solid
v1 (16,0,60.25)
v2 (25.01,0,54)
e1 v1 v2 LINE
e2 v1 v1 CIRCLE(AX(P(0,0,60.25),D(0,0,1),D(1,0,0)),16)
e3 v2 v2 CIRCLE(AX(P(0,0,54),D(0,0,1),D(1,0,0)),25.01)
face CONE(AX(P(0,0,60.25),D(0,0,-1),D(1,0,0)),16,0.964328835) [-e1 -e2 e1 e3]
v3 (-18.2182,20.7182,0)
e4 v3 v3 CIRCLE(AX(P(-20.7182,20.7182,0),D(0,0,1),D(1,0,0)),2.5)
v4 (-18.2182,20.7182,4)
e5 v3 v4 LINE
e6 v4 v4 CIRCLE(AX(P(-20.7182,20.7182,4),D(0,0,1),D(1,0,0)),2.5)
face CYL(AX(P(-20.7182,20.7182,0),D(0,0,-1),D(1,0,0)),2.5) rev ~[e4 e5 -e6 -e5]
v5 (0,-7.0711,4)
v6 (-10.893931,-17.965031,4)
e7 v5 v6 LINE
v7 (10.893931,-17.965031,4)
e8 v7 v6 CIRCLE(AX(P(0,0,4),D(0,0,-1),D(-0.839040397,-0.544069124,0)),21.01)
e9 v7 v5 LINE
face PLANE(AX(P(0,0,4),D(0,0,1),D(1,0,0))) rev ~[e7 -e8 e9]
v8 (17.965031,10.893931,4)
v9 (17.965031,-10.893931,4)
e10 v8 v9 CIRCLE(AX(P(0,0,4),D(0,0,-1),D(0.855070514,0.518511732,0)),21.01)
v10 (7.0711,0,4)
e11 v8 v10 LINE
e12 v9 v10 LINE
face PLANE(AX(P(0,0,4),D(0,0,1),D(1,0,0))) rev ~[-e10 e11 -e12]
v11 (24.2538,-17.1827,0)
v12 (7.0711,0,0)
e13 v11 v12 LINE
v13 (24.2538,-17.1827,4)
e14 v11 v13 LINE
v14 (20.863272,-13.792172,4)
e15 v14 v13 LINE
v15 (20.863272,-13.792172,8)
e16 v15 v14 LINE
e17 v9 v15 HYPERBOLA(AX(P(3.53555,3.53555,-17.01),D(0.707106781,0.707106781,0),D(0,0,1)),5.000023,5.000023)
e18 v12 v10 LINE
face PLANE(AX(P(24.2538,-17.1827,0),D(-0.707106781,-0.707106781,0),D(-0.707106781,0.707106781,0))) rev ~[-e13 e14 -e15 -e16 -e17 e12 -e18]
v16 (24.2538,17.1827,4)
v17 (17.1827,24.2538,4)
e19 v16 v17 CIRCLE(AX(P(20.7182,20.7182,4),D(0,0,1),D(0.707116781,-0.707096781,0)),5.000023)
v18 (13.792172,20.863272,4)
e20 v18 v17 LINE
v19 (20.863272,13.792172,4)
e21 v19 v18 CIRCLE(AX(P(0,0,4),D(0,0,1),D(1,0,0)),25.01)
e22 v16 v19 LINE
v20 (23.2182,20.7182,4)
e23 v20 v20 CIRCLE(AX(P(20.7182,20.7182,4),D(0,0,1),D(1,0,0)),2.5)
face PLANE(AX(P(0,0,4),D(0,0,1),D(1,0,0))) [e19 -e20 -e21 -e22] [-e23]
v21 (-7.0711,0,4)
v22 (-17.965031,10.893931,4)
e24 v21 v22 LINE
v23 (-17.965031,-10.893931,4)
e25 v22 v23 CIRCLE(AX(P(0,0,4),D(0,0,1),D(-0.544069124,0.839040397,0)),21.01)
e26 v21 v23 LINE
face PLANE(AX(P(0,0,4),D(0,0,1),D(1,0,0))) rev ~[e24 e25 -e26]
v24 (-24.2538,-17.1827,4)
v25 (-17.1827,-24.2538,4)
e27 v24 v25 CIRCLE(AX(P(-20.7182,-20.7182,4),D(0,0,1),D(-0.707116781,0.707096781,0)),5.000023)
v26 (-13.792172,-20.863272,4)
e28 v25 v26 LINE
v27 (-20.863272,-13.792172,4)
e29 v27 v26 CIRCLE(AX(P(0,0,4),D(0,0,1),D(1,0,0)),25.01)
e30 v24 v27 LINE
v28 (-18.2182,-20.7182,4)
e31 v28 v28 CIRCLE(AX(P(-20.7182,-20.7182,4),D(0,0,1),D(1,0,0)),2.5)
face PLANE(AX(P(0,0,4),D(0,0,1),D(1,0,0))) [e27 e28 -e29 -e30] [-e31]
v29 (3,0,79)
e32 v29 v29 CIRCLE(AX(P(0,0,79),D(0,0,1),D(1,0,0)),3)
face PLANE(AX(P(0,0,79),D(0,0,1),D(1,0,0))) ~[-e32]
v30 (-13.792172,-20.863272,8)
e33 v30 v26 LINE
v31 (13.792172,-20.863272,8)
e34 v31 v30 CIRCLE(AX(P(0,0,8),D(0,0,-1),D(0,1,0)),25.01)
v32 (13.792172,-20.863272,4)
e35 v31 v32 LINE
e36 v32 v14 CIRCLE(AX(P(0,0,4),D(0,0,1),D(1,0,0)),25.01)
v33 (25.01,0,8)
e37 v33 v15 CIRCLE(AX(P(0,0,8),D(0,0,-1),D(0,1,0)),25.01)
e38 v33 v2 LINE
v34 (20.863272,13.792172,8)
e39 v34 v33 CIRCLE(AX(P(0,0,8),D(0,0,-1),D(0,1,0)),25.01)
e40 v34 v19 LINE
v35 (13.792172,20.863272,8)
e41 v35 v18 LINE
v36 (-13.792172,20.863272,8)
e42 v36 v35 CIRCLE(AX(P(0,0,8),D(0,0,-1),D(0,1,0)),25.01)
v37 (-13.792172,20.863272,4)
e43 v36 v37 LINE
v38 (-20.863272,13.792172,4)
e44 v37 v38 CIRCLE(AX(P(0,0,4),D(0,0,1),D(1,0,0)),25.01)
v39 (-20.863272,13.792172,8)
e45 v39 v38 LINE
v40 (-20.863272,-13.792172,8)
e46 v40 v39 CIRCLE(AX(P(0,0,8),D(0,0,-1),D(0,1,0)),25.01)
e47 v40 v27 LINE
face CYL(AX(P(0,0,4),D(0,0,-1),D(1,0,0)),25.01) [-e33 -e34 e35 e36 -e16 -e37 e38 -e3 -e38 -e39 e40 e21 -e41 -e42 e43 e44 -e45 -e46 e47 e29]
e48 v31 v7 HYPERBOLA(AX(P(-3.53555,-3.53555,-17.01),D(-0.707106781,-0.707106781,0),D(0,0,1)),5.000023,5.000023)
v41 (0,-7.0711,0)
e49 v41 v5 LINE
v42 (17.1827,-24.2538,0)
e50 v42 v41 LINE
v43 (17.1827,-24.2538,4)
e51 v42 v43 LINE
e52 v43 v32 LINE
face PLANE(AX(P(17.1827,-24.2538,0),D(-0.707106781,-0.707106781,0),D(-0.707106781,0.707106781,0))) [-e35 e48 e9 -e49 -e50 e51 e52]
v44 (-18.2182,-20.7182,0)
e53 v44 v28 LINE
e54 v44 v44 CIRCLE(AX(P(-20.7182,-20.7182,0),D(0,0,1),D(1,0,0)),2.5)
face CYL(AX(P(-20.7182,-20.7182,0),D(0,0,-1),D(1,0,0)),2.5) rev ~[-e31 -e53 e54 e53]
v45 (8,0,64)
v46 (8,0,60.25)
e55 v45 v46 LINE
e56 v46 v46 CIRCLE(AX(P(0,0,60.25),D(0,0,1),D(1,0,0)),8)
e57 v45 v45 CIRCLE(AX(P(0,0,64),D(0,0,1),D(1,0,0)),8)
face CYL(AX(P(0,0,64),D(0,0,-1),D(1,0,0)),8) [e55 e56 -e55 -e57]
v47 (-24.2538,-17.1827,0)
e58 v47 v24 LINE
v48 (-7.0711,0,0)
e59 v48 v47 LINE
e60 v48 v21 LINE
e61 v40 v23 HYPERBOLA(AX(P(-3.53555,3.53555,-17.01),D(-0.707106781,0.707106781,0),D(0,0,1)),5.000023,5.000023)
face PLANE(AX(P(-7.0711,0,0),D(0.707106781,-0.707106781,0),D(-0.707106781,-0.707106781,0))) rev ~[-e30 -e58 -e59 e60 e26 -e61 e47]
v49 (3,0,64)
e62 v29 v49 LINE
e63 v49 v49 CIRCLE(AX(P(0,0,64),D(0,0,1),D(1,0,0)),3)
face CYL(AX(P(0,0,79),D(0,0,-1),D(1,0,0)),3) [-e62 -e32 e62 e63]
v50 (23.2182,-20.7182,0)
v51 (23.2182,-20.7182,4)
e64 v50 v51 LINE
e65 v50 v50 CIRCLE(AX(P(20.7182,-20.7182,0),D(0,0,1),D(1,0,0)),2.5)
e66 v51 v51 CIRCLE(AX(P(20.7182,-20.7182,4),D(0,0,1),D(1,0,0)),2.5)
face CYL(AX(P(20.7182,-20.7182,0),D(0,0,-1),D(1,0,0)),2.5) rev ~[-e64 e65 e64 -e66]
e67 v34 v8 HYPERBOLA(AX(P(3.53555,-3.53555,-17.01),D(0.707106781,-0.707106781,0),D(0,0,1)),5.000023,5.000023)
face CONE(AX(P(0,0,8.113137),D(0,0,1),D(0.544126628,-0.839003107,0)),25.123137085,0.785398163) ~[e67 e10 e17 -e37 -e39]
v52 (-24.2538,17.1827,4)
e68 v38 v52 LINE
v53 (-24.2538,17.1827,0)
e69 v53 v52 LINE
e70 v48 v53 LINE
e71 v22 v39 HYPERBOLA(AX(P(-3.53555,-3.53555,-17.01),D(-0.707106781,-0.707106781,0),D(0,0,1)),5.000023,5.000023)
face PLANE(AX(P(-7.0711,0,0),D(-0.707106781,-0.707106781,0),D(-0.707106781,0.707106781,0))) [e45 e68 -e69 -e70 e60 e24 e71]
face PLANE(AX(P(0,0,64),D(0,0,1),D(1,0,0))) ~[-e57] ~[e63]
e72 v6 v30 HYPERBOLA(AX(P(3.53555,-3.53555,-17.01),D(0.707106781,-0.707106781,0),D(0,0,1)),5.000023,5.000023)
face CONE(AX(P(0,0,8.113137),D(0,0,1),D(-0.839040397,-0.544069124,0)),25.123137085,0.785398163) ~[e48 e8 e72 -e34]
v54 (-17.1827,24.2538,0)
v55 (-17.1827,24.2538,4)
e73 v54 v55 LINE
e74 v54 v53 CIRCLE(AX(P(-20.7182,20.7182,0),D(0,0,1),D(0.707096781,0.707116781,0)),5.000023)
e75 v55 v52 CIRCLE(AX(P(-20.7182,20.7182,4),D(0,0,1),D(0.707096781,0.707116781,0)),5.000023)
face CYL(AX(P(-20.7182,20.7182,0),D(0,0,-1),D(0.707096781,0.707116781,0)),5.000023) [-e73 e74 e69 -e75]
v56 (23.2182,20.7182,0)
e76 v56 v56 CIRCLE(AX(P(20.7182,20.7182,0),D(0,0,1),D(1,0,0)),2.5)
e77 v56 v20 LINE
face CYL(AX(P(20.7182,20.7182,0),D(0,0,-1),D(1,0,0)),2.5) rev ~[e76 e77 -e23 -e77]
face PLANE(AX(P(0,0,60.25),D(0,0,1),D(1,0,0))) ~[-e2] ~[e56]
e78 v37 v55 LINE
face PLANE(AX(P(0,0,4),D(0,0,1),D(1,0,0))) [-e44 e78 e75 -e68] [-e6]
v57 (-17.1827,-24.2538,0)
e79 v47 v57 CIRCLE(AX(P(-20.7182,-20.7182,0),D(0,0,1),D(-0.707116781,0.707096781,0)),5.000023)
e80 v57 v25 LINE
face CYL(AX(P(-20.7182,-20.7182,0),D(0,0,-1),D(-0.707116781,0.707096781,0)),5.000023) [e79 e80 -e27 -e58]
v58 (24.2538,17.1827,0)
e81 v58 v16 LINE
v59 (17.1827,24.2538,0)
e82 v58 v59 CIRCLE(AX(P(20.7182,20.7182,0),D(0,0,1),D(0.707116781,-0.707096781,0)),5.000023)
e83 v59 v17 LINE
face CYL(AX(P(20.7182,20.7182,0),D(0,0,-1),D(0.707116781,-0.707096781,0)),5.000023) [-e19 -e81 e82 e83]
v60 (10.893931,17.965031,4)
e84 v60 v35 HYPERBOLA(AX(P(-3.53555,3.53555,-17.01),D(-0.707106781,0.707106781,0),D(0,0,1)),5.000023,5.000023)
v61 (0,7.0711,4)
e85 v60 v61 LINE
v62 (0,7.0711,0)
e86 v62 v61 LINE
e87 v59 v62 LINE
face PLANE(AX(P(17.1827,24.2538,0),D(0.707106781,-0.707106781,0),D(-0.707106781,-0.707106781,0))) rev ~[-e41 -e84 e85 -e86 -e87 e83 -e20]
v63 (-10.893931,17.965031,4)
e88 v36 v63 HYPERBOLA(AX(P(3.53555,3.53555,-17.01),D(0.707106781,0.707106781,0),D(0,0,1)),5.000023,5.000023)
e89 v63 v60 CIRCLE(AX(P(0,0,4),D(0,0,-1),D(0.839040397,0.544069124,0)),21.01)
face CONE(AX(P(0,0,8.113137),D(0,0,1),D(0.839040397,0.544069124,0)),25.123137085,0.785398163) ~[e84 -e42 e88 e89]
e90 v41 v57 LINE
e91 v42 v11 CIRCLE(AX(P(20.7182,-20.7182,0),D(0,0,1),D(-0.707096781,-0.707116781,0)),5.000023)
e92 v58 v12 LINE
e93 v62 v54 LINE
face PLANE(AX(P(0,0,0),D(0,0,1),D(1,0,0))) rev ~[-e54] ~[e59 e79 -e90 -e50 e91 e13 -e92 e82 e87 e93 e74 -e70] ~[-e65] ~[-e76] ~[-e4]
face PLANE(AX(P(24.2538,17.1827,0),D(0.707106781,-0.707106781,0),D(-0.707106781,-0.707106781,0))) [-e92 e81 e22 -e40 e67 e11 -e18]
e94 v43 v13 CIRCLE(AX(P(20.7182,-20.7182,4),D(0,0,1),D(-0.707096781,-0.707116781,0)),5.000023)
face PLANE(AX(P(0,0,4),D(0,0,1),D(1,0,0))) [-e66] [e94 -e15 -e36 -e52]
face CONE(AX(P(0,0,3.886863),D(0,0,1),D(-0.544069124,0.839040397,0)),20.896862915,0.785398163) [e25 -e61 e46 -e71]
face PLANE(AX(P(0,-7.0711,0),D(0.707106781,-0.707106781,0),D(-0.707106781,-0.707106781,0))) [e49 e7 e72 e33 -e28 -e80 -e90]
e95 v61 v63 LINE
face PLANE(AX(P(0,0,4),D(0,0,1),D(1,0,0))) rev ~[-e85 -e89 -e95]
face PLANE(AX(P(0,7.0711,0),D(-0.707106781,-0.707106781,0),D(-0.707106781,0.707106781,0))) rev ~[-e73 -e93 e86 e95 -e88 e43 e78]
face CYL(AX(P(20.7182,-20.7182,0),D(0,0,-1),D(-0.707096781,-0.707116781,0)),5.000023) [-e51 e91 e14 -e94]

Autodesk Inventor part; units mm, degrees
ref_plane "YZ Plane" through (0, 0, 0) normal (1, 0, 0) x (0, 1, 0)
ref_plane "XZ Plane" through (0, 0, 0) normal (0, 1, 0) x (-1, 0, 0)
sketch "Sketch1" plane through (0, 0, 0) normal (0, 0, 1) x (1, 0, 0)
  line L0 (0, 0) -> (-20.7182, 20.7182) construction
  line L1 (7.0711, 0) -> (29.3, 0) construction
  line L2 (0, 0) -> (20.7182, 20.7182) construction
  line L3 (0, 0) -> (29.3, 0) construction
  line L4 (-20.7182, 20.7182) -> (20.7182, 20.7182) construction
  circle A0 centre (-20.7182, 20.7182) radius 2.5
  circle A1 centre (20.7182, 20.7182) radius 2.5
  circle A2 centre (-20.7182, -20.7182) radius 2.5
  circle A3 centre (20.7182, -20.7182) radius 2.5
  arc A4 (-24.2538, -17.1827) -> (-17.1827, -24.2538) centre (-20.7182, -20.7182) ccw
  line L5 (20.7182, 20.7182) -> (13.788, 27.6485) construction
  arc A5 (24.2538, 17.1827) -> (17.1827, 24.2538) centre (20.7182, 20.7182) ccw
  arc A6 (-17.1827, 24.2538) -> (-24.2538, 17.1827) centre (-20.7182, 20.7182) ccw
  arc A7 (17.1827, -24.2538) -> (24.2538, -17.1827) centre (20.7182, -20.7182) ccw
  line L6 (17.1827, 24.2538) -> (0, 7.0711)
  line L7 (-7.0711, 0) -> (-24.2538, -17.1827)
  line L8 (24.2538, -17.1827) -> (7.0711, 0)
  line L9 (0, 7.0711) -> (-17.1827, 24.2538)
  line L10 (24.2538, 17.1827) -> (7.0711, 0)
  line L11 (0, -7.0711) -> (-17.1827, -24.2538)
  line L12 (17.1827, -24.2538) -> (0, -7.0711)
  line L13 (-7.0711, 0) -> (-24.2538, 17.1827)
  dimension "d0" = 29.3
  dimension "d1" = 135
  dimension "d2" = 29.3
  dimension "d3" = 45
  dimension "d4" = 2.5
  dimension "d5" = 2.5
  dimension "d6" = 5
  dimension "d7" = 5
extrude "Extrusion1" add sketch "Sketch1" along normal blind 4
sketch "Sketch2" plane through (0, 0, 4) normal (0, 0, 1) x (1, 0, 0)
  circle A0 centre (0, 0) radius 25.01
  dimension "d10" = 25.01
extrude "Extrusion2" add sketch "Sketch2" along normal blind 50
chamfer "Chamfer1" distance 4 angle 45 4 edges at (23.9509, 7.201, 4) (0, -25.01, 4) (-25.01, 0, 4) (0, 25.01, 4)
sketch "Sketch3" plane through (0, 0, 54) normal (0, 0, 1) x (1, 0, 0)
  line L0 (0, 0) -> (25.01, 0)
  circle A0 centre (0, 0) radius 25.01 projected
sketch "Sketch4" plane through (0, 0, 0) normal (0, 0, -1) x (-1, 0, 0)
  point P0 (0, 0)
  point P1 (0, 0)
ref_plane "Work Plane1" through (0, 0, 0) normal (0, 1, 0) x (0, 0, 1)
sketch "Sketch5" plane through (0, 0, 0) normal (0, 1, 0) x (0, 0, 1)
  line L0 (54, -25.01) -> (54, 25.01) projected
  line L1 (54, 0) -> (79, 0)
  line L2 (79, 0) -> (79, 3)
  line L3 (79, 3) -> (64, 3)
  line L4 (64, 3) -> (64, 8)
  line L5 (64, 8) -> (60.25, 8)
  line L6 (60.25, 8) -> (60.25, 16)
  line L7 (60.25, 16) -> (54, 25.01)
  point P0 (0, 0)
  dimension "d16" = 25
  dimension "d17" = 3
  dimension "d18" = 15
  dimension "d19" = 5
  dimension "d20" = 3.75
  dimension "d21" = 8
revolve "Revolution1" add sketch "Sketch5" angle 360 about axis through (0, 0, 54) along (0, 0, 1)
sketch "Sketch6" plane through (0, 0, 79) normal (0, 0, 1) x (1, 0, 0)
  circle A0 centre (0, 0) radius 3 projected
  circle A1 centre (0, 0) radius 178
  dimension "d23" = 356
properties part number "Motor Turnigy G60 500kv"
